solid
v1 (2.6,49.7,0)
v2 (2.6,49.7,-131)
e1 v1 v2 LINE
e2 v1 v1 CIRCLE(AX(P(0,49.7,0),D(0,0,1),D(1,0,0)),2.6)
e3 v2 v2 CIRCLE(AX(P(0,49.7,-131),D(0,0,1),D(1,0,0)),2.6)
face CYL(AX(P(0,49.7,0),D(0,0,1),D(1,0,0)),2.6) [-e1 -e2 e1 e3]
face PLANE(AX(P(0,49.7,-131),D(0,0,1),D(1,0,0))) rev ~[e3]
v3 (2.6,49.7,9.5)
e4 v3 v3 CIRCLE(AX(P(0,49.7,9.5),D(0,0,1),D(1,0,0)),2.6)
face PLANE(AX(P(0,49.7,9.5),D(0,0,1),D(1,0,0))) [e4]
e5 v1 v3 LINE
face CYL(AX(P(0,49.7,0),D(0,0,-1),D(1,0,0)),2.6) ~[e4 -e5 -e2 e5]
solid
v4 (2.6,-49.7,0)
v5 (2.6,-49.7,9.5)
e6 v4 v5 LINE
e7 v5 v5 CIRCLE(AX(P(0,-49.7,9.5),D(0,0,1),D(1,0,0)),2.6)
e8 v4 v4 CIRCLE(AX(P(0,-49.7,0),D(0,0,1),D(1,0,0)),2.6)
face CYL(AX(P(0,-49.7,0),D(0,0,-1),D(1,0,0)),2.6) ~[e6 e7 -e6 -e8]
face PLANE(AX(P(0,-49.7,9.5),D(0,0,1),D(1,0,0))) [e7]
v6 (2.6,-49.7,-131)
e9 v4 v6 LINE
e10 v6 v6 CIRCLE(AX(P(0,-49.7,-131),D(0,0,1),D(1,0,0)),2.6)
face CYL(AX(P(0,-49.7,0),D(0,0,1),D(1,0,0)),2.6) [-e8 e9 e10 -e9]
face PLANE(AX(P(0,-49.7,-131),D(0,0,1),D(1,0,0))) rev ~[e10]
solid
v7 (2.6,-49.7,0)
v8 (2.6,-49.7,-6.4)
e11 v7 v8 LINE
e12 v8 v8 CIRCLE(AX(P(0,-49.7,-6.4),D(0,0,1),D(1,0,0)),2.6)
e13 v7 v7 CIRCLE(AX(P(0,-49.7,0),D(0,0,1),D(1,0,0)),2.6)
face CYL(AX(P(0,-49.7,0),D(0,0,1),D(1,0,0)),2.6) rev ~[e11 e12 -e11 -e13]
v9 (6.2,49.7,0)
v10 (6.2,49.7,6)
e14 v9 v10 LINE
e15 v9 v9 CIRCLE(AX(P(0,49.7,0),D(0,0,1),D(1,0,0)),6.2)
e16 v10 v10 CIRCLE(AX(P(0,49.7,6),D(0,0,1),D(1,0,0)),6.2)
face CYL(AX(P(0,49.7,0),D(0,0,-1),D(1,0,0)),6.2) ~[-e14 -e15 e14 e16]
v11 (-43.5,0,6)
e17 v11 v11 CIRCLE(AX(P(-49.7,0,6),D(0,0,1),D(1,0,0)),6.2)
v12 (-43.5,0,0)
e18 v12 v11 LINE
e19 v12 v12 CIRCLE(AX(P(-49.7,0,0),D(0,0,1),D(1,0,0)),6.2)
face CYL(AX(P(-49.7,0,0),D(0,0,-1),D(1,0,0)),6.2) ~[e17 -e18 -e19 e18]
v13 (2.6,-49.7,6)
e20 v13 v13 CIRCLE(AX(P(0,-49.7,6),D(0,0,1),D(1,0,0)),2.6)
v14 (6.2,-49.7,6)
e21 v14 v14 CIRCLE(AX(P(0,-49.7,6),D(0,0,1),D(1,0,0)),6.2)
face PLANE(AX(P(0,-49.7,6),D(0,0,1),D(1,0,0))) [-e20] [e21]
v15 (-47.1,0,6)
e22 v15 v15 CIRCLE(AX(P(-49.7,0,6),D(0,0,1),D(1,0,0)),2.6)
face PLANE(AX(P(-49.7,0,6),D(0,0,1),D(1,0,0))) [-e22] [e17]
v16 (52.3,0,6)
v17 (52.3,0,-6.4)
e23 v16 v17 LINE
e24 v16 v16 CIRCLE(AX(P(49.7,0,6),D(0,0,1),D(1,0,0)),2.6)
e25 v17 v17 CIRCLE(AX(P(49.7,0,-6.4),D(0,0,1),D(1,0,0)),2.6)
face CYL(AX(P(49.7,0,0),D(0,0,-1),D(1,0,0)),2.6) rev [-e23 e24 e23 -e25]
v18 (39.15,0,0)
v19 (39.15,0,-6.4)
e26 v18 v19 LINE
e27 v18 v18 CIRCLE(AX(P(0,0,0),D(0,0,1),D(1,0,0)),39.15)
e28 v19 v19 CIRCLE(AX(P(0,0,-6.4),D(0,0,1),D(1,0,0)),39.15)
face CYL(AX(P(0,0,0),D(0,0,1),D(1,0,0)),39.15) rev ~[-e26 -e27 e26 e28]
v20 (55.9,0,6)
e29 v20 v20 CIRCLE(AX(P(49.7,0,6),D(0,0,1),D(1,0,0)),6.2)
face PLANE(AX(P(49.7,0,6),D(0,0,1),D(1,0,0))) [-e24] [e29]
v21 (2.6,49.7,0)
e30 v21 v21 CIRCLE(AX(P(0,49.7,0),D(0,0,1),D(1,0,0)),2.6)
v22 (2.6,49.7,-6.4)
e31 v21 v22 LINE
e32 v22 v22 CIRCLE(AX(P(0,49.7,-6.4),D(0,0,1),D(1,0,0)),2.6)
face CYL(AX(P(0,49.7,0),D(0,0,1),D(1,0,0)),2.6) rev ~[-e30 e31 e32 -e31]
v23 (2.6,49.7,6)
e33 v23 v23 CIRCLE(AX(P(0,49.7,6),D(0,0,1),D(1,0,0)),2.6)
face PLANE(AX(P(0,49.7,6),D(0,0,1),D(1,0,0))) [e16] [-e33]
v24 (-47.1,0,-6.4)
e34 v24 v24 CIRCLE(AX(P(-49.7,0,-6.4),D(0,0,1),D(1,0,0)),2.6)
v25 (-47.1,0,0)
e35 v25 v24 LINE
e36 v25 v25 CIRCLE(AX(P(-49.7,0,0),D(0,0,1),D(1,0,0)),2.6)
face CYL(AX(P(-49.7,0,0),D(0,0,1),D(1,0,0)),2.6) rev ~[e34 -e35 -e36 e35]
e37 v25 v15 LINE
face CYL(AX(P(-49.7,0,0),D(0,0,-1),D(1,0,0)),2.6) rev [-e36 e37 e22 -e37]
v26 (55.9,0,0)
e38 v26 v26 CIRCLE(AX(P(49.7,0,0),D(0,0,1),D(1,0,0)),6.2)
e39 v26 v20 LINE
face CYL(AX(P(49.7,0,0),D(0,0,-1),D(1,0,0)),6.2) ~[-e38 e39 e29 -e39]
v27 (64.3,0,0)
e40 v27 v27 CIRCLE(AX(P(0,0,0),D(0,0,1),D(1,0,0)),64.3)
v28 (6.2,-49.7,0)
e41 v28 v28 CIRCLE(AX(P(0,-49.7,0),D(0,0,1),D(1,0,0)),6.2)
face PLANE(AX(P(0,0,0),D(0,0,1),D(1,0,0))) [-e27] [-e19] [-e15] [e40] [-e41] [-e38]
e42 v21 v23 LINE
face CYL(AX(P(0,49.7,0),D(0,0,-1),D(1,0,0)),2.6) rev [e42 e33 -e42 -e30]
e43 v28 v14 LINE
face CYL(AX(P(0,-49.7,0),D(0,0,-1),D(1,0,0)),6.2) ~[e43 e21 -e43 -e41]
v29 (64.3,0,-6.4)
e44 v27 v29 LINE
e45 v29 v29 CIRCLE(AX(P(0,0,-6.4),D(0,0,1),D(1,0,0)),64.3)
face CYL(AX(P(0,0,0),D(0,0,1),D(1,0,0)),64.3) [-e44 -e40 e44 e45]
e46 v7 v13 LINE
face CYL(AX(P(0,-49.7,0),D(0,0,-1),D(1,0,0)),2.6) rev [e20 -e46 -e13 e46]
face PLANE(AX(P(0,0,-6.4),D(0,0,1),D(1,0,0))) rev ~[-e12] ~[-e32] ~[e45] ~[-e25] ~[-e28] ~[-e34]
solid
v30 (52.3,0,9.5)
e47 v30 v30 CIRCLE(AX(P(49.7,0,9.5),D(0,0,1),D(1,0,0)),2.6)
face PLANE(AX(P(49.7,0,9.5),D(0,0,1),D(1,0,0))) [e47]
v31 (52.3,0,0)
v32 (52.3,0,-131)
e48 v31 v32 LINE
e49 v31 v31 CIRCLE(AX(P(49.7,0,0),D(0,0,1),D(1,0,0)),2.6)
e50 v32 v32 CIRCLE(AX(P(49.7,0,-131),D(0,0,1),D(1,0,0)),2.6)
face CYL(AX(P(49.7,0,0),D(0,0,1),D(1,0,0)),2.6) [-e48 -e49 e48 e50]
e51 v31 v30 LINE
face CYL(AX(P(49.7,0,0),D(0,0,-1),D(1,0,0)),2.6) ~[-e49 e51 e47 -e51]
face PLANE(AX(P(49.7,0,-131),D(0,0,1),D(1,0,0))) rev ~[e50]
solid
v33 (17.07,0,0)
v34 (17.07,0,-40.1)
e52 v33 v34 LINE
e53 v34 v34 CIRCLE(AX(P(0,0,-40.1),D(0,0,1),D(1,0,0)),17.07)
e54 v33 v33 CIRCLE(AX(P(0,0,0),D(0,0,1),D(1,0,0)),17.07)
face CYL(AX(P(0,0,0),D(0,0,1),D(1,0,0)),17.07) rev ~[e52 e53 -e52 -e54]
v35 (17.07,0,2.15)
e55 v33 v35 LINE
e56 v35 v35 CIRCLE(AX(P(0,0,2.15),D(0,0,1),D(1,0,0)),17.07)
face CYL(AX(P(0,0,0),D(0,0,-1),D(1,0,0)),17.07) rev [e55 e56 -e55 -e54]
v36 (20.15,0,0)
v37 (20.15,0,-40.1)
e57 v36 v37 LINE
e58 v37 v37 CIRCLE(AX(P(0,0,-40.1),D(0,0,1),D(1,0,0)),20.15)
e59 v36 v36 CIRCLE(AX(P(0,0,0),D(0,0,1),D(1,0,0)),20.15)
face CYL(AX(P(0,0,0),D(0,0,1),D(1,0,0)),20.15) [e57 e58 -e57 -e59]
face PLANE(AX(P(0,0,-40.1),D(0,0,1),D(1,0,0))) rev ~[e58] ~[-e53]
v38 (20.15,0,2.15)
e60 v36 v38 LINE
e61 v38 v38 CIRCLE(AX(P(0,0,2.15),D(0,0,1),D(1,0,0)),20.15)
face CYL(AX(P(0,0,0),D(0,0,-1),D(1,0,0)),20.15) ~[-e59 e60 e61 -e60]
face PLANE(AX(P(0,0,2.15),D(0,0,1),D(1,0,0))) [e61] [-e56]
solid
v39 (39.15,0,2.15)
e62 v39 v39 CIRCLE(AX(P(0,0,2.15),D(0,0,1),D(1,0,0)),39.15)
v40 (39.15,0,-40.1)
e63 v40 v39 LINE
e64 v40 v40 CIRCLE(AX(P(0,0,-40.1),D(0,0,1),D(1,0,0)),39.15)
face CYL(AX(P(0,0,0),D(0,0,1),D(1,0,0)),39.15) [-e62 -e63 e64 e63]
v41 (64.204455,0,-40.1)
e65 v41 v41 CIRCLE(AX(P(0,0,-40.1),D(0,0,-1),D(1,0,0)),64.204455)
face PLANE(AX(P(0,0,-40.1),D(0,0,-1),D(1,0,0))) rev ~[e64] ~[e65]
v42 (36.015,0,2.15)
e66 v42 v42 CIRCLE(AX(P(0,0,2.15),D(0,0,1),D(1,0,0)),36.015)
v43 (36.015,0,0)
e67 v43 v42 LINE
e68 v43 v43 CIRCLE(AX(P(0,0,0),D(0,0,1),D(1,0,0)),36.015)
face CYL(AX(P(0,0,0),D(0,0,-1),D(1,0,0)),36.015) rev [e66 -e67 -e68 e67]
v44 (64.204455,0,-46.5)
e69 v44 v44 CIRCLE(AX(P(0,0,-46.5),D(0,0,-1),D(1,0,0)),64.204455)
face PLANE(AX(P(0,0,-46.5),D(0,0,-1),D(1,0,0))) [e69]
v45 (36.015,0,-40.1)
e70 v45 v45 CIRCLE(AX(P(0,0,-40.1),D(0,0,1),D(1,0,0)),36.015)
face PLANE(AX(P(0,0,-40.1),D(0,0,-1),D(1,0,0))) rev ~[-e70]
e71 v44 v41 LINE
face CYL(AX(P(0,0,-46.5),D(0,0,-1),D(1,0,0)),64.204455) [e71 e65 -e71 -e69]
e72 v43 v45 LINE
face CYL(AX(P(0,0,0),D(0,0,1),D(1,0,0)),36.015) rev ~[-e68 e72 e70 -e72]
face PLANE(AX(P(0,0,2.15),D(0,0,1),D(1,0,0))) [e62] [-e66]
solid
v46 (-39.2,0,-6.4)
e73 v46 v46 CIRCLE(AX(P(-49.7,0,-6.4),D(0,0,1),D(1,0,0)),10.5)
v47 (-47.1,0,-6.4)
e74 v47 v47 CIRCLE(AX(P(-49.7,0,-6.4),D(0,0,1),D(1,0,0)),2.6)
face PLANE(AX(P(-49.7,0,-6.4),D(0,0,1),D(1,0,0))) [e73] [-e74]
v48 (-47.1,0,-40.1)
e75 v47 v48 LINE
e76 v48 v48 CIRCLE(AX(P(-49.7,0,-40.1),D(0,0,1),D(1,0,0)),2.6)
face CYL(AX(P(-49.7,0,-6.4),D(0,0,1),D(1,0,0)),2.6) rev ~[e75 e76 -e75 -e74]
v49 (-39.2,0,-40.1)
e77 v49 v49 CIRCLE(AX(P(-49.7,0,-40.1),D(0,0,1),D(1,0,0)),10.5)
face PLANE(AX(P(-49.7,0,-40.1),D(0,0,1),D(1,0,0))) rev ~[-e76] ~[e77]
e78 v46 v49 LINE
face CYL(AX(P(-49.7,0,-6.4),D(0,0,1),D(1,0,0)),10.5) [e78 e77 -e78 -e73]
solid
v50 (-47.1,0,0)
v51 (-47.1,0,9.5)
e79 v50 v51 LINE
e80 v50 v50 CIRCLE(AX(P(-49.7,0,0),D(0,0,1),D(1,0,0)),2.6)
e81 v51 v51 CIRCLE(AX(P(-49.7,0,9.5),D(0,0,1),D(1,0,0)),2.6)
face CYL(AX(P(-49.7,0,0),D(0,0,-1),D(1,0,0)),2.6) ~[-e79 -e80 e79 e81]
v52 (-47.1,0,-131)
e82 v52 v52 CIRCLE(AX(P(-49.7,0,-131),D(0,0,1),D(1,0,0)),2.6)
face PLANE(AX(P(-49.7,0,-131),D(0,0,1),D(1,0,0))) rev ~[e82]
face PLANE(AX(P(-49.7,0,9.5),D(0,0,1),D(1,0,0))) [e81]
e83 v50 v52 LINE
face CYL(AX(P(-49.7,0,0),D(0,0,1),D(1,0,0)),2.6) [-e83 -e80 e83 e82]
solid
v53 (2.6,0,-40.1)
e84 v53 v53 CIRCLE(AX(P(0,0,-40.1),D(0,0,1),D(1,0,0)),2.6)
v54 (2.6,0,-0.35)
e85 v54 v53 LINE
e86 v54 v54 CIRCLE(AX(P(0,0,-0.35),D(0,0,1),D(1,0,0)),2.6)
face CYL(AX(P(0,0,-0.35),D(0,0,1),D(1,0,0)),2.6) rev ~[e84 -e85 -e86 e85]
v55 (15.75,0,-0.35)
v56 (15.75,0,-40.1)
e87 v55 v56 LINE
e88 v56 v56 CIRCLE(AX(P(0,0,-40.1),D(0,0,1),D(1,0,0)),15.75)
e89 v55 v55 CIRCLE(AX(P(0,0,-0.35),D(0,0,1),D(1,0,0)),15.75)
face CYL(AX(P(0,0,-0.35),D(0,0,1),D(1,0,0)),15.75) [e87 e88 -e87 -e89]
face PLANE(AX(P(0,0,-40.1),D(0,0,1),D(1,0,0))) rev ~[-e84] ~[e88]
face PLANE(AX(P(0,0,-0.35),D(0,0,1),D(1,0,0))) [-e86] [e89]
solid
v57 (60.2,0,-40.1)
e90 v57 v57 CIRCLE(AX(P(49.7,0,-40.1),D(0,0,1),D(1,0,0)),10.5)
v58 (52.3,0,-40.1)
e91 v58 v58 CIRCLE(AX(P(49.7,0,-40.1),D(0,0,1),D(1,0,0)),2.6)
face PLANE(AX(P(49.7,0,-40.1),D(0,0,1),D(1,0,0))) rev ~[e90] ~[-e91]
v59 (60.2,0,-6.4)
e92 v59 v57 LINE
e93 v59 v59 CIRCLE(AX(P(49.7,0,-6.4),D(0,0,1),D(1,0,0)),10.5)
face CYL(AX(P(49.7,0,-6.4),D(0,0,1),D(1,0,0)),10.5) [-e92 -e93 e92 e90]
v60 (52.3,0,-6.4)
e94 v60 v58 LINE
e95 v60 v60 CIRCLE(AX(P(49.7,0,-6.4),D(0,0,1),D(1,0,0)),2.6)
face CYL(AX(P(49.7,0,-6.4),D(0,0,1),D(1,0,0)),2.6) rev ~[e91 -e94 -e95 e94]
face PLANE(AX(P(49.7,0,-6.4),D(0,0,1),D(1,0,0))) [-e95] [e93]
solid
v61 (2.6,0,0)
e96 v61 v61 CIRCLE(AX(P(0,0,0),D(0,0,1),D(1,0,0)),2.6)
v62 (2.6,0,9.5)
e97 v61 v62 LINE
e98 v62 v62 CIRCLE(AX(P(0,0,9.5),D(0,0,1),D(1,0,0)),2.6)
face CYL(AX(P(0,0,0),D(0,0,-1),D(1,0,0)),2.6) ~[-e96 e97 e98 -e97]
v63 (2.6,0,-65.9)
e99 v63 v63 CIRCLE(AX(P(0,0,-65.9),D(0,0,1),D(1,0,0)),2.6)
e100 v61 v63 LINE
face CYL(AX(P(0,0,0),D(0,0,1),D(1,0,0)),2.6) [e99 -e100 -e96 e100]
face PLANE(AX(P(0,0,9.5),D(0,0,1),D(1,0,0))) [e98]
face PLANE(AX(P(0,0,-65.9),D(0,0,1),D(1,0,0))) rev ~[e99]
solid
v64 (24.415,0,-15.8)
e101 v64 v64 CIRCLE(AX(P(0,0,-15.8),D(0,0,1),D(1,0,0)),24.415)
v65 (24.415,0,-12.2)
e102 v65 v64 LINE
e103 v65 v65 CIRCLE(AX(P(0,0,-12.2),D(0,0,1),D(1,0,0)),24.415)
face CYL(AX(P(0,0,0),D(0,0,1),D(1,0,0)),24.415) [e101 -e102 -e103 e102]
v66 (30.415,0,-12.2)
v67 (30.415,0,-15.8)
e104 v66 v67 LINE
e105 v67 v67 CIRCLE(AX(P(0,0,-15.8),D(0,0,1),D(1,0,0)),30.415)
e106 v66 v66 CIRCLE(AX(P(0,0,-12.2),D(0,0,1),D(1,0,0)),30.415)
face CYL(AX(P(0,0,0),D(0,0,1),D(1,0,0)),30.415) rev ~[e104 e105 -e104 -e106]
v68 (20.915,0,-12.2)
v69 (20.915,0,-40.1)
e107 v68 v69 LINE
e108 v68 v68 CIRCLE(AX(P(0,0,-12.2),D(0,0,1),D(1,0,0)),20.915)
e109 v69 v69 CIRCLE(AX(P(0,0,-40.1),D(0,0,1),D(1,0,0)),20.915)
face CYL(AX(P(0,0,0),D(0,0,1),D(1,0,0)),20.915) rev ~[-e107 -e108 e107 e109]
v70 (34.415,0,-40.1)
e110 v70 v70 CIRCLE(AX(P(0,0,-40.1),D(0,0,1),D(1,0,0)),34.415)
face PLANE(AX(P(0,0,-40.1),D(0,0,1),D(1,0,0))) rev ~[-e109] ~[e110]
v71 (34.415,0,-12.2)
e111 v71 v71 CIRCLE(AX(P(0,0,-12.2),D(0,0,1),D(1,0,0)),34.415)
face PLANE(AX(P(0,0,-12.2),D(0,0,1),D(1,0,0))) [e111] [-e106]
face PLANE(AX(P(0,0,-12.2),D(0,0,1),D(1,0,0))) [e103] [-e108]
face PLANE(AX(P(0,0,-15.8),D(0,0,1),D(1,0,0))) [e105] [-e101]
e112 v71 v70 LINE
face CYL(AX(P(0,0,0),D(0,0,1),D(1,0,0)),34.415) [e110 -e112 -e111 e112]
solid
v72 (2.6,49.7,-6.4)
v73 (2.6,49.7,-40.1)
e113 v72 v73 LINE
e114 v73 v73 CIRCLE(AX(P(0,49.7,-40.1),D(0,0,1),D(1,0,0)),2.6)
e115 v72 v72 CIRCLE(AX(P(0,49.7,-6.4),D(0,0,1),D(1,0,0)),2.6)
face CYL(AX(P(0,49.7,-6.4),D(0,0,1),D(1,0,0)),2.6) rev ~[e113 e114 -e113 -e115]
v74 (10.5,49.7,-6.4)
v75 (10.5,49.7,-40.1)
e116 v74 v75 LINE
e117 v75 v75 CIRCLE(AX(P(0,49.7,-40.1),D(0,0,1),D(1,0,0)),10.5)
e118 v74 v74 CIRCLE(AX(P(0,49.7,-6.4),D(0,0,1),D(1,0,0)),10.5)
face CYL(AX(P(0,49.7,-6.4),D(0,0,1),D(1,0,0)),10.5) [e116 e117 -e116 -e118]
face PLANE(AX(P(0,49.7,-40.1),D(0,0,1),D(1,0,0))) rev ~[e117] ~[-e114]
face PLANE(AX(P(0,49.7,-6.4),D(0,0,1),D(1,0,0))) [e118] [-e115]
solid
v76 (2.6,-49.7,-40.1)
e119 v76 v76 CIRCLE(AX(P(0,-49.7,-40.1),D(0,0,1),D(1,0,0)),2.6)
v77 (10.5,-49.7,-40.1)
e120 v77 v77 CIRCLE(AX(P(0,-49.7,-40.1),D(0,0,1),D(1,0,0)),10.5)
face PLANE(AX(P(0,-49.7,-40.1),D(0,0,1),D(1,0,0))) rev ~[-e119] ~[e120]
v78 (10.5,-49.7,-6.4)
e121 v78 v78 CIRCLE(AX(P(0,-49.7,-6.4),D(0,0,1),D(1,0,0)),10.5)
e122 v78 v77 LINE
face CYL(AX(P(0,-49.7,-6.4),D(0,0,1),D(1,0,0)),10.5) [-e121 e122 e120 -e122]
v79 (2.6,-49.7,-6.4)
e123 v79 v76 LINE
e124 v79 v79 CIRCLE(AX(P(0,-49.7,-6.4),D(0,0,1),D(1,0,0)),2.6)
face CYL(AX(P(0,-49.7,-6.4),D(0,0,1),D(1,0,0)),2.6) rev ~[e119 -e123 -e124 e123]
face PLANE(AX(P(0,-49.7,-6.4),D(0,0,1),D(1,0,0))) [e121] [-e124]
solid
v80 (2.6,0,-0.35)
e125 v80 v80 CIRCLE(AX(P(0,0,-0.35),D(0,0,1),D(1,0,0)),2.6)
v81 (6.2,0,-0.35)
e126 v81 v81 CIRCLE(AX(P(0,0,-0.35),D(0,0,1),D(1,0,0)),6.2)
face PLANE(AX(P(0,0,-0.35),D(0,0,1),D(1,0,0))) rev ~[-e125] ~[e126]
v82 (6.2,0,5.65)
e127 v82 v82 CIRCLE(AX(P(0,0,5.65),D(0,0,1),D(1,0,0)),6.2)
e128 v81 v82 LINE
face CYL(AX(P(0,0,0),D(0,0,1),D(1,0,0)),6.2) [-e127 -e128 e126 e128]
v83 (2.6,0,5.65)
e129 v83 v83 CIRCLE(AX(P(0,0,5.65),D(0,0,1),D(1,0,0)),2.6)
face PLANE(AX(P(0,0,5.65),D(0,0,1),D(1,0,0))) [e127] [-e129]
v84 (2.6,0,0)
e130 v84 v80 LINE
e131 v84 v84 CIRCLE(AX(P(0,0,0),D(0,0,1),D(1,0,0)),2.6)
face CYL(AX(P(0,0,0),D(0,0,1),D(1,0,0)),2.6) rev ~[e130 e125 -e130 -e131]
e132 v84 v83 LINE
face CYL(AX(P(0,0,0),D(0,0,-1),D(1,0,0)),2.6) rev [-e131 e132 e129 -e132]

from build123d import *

# Parameters (mm, degrees)
F0_R           = 64.3
F0_R_2         = 10.5
F0_R_3         = 39.15
F0_R_4         = 6.2
F0_R_5         = 2.6
F1_DEPTH       = 6.4
F0_R_6         = 36.015
F2_DEPTH       = 46.5
F2_DEPTH_BACK  = 2.15
F3_R           = 64.2044551284
F3_R_2         = 39.15
F3_R_3         = 36.015
F4_DEPTH       = 6.4
F0_R_7         = 20.15
F0_R_8         = 17.07
F5_DEPTH       = 40.1
F5_DEPTH_BACK  = 2.15
F0_R_9         = 34.415
F0_R_10        = 30.415
F0_R_11        = 24.415
F0_R_12        = 20.915
F6_DEPTH       = 40.1
F7_DEPTH       = 12.2
F8_DEPTH       = 15.8
F9_DEPTH       = 12.2
F10_START      = -0.35
F0_R_13        = 15.75
F10_DEPTH      = 39.75
F11_DEPTH      = 6
F12_DEPTH      = 131
F12_DEPTH_BACK = 9.5
F13_START      = -6.4
F13_DEPTH      = 33.7
F14_DEPTH      = 65.9
F14_DEPTH_BACK = 9.5
F15_DEPTH      = 5.65
F15_DEPTH_BACK = 0.35


with BuildPart() as f1:
    # F0 (on Top) → F1 (new body)
    with BuildSketch(Plane.XY):
        Circle(F0_R)
        with Locations((0, -49.7)):
            Circle(F0_R_2, mode=Mode.SUBTRACT)
        with Locations((-49.7, 0)):
            Circle(F0_R_2, mode=Mode.SUBTRACT)
        Circle(F0_R_3, mode=Mode.SUBTRACT)
        with Locations((49.7, 0)):
            Circle(F0_R_2, mode=Mode.SUBTRACT)
        with Locations((0, 49.7)):
            Circle(F0_R_2, mode=Mode.SUBTRACT)
        with Locations((0, -49.7)):
            Circle(F0_R_2)
        with Locations((0, -49.7)):
            Circle(F0_R_4, mode=Mode.SUBTRACT)
        with Locations((49.7, 0)):
            Circle(F0_R_2)
        with Locations((49.7, 0)):
            Circle(F0_R_4, mode=Mode.SUBTRACT)
        with Locations((0, 49.7)):
            Circle(F0_R_2)
        with Locations((0, 49.7)):
            Circle(F0_R_4, mode=Mode.SUBTRACT)
        with Locations((-49.7, 0)):
            Circle(F0_R_2)
        with Locations((-49.7, 0)):
            Circle(F0_R_4, mode=Mode.SUBTRACT)
        with Locations((0, -49.7)):
            Circle(F0_R_4)
        with Locations((0, -49.7)):
            Circle(F0_R_5, mode=Mode.SUBTRACT)
        with Locations((49.7, 0)):
            Circle(F0_R_4)
        with Locations((49.7, 0)):
            Circle(F0_R_5, mode=Mode.SUBTRACT)
        with Locations((0, 49.7)):
            Circle(F0_R_4)
        with Locations((0, 49.7)):
            Circle(F0_R_5, mode=Mode.SUBTRACT)
        with Locations((-49.7, 0)):
            Circle(F0_R_4)
        with Locations((-49.7, 0)):
            Circle(F0_R_5, mode=Mode.SUBTRACT)
    extrude(amount=-F1_DEPTH)

    # F0 (on Top) → F11 (join)
    with BuildSketch(Plane.XY):
        with Locations((49.7, 0)):
            Circle(F0_R_4)
        with Locations((49.7, 0)):
            Circle(F0_R_5, mode=Mode.SUBTRACT)
        with Locations((0, -49.7)):
            Circle(F0_R_4)
        with Locations((0, -49.7)):
            Circle(F0_R_5, mode=Mode.SUBTRACT)
        with Locations((-49.7, 0)):
            Circle(F0_R_4)
        with Locations((-49.7, 0)):
            Circle(F0_R_5, mode=Mode.SUBTRACT)
        with Locations((0, 49.7)):
            Circle(F0_R_4)
        with Locations((0, 49.7)):
            Circle(F0_R_5, mode=Mode.SUBTRACT)
    extrude(amount=F11_DEPTH)


with BuildPart() as f2:
    # F0 (on Top) → F2 (new body, two sides)
    with BuildSketch(Plane.XY) as f2_sk:
        Circle(F0_R_3)
        Circle(F0_R_6, mode=Mode.SUBTRACT)
    extrude(amount=-F2_DEPTH)
    extrude(f2_sk.sketch, amount=F2_DEPTH_BACK)

    # F3 (on face) → F4 (join)
    with BuildSketch(Plane(origin=(0, 0, -46.5), x_dir=(1, 0, 0), z_dir=(0, 0, -1))):
        Circle(F3_R)
        Circle(F3_R_2, mode=Mode.SUBTRACT)
        Circle(F3_R_2)
        Circle(F3_R_3, mode=Mode.SUBTRACT)
        Circle(F3_R_3)
    extrude(amount=-F4_DEPTH)


with BuildPart() as f5:
    # F0 (on Top) → F5 (new body, two sides)
    with BuildSketch(Plane.XY) as f5_sk:
        Circle(F0_R_7)
        Circle(F0_R_8, mode=Mode.SUBTRACT)
    extrude(amount=-F5_DEPTH)
    extrude(f5_sk.sketch, amount=F5_DEPTH_BACK)


with BuildPart() as f6:
    # F0 (on Top) → F6 (new body)
    with BuildSketch(Plane.XY):
        Circle(F0_R_9)
        Circle(F0_R_10, mode=Mode.SUBTRACT)
        Circle(F0_R_10)
        Circle(F0_R_11, mode=Mode.SUBTRACT)
        Circle(F0_R_11)
        Circle(F0_R_12, mode=Mode.SUBTRACT)
    extrude(amount=-F6_DEPTH)

    # F0 (on Top) → F7 (cut)
    with BuildSketch(Plane.XY):
        Circle(F0_R_9)
        Circle(F0_R_10, mode=Mode.SUBTRACT)
    extrude(amount=-F7_DEPTH, mode=Mode.SUBTRACT)

    # F0 (on Top) → F8 (cut)
    with BuildSketch(Plane.XY):
        Circle(F0_R_10)
        Circle(F0_R_11, mode=Mode.SUBTRACT)
    extrude(amount=-F8_DEPTH, mode=Mode.SUBTRACT)

    # F0 (on Top) → F9 (cut)
    with BuildSketch(Plane.XY):
        Circle(F0_R_11)
        Circle(F0_R_12, mode=Mode.SUBTRACT)
    extrude(amount=-F9_DEPTH, mode=Mode.SUBTRACT)


with BuildPart() as f10:
    # F0 (on Top) → F10 (new body)
    with BuildSketch(Plane.XY.offset(F10_START)):
        Circle(F0_R_13)
        Circle(F0_R_4, mode=Mode.SUBTRACT)
        Circle(F0_R_4)
        Circle(F0_R_5, mode=Mode.SUBTRACT)
    extrude(amount=-F10_DEPTH)


with BuildPart() as f12:
    # F0 (on Top) → F12 (new body, two sides)
    with BuildSketch(Plane.XY) as f12_sk:
        with Locations((-49.7, 0)):
            Circle(F0_R_5)
    extrude(amount=-F12_DEPTH)
    extrude(f12_sk.sketch, amount=F12_DEPTH_BACK)


with BuildPart() as f12b:
    # F0 (on Top) → F12, piece 2 (new body, two sides)
    with BuildSketch(Plane.XY) as f12_2_sk:
        with Locations((0, 49.7)):
            Circle(F0_R_5)
    extrude(amount=-F12_DEPTH)
    extrude(f12_2_sk.sketch, amount=F12_DEPTH_BACK)


with BuildPart() as f12c:
    # F0 (on Top) → F12, piece 3 (new body, two sides)
    with BuildSketch(Plane.XY) as f12_3_sk:
        with Locations((49.7, 0)):
            Circle(F0_R_5)
    extrude(amount=-F12_DEPTH)
    extrude(f12_3_sk.sketch, amount=F12_DEPTH_BACK)


with BuildPart() as f12d:
    # F0 (on Top) → F12, piece 4 (new body, two sides)
    with BuildSketch(Plane.XY) as f12_4_sk:
        with Locations((0, -49.7)):
            Circle(F0_R_5)
    extrude(amount=-F12_DEPTH)
    extrude(f12_4_sk.sketch, amount=F12_DEPTH_BACK)


with BuildPart() as f13:
    # F0 (on Top) → F13 (new body)
    with BuildSketch(Plane.XY.offset(F13_START)):
        with Locations((0, -49.7)):
            Circle(F0_R_2)
        with Locations((0, -49.7)):
            Circle(F0_R_4, mode=Mode.SUBTRACT)
        with Locations((0, -49.7)):
            Circle(F0_R_4)
        with Locations((0, -49.7)):
            Circle(F0_R_5, mode=Mode.SUBTRACT)
    extrude(amount=-F13_DEPTH)


with BuildPart() as f13b:
    # F0 (on Top) → F13, piece 2 (new body)
    with BuildSketch(Plane.XY.offset(F13_START)):
        with Locations((0, 49.7)):
            Circle(F0_R_2)
        with Locations((0, 49.7)):
            Circle(F0_R_4, mode=Mode.SUBTRACT)
        with Locations((0, 49.7)):
            Circle(F0_R_4)
        with Locations((0, 49.7)):
            Circle(F0_R_5, mode=Mode.SUBTRACT)
    extrude(amount=-F13_DEPTH)


with BuildPart() as f13c:
    # F0 (on Top) → F13, piece 3 (new body)
    with BuildSketch(Plane.XY.offset(F13_START)):
        with Locations((-49.7, 0)):
            Circle(F0_R_2)
        with Locations((-49.7, 0)):
            Circle(F0_R_4, mode=Mode.SUBTRACT)
        with Locations((-49.7, 0)):
            Circle(F0_R_4)
        with Locations((-49.7, 0)):
            Circle(F0_R_5, mode=Mode.SUBTRACT)
    extrude(amount=-F13_DEPTH)


with BuildPart() as f13d:
    # F0 (on Top) → F13, piece 4 (new body)
    with BuildSketch(Plane.XY.offset(F13_START)):
        with Locations((49.7, 0)):
            Circle(F0_R_2)
        with Locations((49.7, 0)):
            Circle(F0_R_4, mode=Mode.SUBTRACT)
        with Locations((49.7, 0)):
            Circle(F0_R_4)
        with Locations((49.7, 0)):
            Circle(F0_R_5, mode=Mode.SUBTRACT)
    extrude(amount=-F13_DEPTH)


with BuildPart() as f14:
    # F0 (on Top) → F14 (new body, two sides)
    with BuildSketch(Plane.XY) as f14_sk:
        Circle(F0_R_5)
    extrude(amount=-F14_DEPTH)
    extrude(f14_sk.sketch, amount=F14_DEPTH_BACK)


with BuildPart() as f15:
    # F0 (on Top) → F15 (new body, two sides)
    with BuildSketch(Plane.XY) as f15_sk:
        Circle(F0_R_4)
        Circle(F0_R_5, mode=Mode.SUBTRACT)
    extrude(amount=F15_DEPTH)
    extrude(f15_sk.sketch, amount=-F15_DEPTH_BACK)


solid = Compound([f1.part, f2.part, f5.part, f6.part, f10.part, f12.part, f12b.part, f12c.part, f12d.part, f13.part, f13b.part, f13c.part, f13d.part, f14.part, f15.part])
